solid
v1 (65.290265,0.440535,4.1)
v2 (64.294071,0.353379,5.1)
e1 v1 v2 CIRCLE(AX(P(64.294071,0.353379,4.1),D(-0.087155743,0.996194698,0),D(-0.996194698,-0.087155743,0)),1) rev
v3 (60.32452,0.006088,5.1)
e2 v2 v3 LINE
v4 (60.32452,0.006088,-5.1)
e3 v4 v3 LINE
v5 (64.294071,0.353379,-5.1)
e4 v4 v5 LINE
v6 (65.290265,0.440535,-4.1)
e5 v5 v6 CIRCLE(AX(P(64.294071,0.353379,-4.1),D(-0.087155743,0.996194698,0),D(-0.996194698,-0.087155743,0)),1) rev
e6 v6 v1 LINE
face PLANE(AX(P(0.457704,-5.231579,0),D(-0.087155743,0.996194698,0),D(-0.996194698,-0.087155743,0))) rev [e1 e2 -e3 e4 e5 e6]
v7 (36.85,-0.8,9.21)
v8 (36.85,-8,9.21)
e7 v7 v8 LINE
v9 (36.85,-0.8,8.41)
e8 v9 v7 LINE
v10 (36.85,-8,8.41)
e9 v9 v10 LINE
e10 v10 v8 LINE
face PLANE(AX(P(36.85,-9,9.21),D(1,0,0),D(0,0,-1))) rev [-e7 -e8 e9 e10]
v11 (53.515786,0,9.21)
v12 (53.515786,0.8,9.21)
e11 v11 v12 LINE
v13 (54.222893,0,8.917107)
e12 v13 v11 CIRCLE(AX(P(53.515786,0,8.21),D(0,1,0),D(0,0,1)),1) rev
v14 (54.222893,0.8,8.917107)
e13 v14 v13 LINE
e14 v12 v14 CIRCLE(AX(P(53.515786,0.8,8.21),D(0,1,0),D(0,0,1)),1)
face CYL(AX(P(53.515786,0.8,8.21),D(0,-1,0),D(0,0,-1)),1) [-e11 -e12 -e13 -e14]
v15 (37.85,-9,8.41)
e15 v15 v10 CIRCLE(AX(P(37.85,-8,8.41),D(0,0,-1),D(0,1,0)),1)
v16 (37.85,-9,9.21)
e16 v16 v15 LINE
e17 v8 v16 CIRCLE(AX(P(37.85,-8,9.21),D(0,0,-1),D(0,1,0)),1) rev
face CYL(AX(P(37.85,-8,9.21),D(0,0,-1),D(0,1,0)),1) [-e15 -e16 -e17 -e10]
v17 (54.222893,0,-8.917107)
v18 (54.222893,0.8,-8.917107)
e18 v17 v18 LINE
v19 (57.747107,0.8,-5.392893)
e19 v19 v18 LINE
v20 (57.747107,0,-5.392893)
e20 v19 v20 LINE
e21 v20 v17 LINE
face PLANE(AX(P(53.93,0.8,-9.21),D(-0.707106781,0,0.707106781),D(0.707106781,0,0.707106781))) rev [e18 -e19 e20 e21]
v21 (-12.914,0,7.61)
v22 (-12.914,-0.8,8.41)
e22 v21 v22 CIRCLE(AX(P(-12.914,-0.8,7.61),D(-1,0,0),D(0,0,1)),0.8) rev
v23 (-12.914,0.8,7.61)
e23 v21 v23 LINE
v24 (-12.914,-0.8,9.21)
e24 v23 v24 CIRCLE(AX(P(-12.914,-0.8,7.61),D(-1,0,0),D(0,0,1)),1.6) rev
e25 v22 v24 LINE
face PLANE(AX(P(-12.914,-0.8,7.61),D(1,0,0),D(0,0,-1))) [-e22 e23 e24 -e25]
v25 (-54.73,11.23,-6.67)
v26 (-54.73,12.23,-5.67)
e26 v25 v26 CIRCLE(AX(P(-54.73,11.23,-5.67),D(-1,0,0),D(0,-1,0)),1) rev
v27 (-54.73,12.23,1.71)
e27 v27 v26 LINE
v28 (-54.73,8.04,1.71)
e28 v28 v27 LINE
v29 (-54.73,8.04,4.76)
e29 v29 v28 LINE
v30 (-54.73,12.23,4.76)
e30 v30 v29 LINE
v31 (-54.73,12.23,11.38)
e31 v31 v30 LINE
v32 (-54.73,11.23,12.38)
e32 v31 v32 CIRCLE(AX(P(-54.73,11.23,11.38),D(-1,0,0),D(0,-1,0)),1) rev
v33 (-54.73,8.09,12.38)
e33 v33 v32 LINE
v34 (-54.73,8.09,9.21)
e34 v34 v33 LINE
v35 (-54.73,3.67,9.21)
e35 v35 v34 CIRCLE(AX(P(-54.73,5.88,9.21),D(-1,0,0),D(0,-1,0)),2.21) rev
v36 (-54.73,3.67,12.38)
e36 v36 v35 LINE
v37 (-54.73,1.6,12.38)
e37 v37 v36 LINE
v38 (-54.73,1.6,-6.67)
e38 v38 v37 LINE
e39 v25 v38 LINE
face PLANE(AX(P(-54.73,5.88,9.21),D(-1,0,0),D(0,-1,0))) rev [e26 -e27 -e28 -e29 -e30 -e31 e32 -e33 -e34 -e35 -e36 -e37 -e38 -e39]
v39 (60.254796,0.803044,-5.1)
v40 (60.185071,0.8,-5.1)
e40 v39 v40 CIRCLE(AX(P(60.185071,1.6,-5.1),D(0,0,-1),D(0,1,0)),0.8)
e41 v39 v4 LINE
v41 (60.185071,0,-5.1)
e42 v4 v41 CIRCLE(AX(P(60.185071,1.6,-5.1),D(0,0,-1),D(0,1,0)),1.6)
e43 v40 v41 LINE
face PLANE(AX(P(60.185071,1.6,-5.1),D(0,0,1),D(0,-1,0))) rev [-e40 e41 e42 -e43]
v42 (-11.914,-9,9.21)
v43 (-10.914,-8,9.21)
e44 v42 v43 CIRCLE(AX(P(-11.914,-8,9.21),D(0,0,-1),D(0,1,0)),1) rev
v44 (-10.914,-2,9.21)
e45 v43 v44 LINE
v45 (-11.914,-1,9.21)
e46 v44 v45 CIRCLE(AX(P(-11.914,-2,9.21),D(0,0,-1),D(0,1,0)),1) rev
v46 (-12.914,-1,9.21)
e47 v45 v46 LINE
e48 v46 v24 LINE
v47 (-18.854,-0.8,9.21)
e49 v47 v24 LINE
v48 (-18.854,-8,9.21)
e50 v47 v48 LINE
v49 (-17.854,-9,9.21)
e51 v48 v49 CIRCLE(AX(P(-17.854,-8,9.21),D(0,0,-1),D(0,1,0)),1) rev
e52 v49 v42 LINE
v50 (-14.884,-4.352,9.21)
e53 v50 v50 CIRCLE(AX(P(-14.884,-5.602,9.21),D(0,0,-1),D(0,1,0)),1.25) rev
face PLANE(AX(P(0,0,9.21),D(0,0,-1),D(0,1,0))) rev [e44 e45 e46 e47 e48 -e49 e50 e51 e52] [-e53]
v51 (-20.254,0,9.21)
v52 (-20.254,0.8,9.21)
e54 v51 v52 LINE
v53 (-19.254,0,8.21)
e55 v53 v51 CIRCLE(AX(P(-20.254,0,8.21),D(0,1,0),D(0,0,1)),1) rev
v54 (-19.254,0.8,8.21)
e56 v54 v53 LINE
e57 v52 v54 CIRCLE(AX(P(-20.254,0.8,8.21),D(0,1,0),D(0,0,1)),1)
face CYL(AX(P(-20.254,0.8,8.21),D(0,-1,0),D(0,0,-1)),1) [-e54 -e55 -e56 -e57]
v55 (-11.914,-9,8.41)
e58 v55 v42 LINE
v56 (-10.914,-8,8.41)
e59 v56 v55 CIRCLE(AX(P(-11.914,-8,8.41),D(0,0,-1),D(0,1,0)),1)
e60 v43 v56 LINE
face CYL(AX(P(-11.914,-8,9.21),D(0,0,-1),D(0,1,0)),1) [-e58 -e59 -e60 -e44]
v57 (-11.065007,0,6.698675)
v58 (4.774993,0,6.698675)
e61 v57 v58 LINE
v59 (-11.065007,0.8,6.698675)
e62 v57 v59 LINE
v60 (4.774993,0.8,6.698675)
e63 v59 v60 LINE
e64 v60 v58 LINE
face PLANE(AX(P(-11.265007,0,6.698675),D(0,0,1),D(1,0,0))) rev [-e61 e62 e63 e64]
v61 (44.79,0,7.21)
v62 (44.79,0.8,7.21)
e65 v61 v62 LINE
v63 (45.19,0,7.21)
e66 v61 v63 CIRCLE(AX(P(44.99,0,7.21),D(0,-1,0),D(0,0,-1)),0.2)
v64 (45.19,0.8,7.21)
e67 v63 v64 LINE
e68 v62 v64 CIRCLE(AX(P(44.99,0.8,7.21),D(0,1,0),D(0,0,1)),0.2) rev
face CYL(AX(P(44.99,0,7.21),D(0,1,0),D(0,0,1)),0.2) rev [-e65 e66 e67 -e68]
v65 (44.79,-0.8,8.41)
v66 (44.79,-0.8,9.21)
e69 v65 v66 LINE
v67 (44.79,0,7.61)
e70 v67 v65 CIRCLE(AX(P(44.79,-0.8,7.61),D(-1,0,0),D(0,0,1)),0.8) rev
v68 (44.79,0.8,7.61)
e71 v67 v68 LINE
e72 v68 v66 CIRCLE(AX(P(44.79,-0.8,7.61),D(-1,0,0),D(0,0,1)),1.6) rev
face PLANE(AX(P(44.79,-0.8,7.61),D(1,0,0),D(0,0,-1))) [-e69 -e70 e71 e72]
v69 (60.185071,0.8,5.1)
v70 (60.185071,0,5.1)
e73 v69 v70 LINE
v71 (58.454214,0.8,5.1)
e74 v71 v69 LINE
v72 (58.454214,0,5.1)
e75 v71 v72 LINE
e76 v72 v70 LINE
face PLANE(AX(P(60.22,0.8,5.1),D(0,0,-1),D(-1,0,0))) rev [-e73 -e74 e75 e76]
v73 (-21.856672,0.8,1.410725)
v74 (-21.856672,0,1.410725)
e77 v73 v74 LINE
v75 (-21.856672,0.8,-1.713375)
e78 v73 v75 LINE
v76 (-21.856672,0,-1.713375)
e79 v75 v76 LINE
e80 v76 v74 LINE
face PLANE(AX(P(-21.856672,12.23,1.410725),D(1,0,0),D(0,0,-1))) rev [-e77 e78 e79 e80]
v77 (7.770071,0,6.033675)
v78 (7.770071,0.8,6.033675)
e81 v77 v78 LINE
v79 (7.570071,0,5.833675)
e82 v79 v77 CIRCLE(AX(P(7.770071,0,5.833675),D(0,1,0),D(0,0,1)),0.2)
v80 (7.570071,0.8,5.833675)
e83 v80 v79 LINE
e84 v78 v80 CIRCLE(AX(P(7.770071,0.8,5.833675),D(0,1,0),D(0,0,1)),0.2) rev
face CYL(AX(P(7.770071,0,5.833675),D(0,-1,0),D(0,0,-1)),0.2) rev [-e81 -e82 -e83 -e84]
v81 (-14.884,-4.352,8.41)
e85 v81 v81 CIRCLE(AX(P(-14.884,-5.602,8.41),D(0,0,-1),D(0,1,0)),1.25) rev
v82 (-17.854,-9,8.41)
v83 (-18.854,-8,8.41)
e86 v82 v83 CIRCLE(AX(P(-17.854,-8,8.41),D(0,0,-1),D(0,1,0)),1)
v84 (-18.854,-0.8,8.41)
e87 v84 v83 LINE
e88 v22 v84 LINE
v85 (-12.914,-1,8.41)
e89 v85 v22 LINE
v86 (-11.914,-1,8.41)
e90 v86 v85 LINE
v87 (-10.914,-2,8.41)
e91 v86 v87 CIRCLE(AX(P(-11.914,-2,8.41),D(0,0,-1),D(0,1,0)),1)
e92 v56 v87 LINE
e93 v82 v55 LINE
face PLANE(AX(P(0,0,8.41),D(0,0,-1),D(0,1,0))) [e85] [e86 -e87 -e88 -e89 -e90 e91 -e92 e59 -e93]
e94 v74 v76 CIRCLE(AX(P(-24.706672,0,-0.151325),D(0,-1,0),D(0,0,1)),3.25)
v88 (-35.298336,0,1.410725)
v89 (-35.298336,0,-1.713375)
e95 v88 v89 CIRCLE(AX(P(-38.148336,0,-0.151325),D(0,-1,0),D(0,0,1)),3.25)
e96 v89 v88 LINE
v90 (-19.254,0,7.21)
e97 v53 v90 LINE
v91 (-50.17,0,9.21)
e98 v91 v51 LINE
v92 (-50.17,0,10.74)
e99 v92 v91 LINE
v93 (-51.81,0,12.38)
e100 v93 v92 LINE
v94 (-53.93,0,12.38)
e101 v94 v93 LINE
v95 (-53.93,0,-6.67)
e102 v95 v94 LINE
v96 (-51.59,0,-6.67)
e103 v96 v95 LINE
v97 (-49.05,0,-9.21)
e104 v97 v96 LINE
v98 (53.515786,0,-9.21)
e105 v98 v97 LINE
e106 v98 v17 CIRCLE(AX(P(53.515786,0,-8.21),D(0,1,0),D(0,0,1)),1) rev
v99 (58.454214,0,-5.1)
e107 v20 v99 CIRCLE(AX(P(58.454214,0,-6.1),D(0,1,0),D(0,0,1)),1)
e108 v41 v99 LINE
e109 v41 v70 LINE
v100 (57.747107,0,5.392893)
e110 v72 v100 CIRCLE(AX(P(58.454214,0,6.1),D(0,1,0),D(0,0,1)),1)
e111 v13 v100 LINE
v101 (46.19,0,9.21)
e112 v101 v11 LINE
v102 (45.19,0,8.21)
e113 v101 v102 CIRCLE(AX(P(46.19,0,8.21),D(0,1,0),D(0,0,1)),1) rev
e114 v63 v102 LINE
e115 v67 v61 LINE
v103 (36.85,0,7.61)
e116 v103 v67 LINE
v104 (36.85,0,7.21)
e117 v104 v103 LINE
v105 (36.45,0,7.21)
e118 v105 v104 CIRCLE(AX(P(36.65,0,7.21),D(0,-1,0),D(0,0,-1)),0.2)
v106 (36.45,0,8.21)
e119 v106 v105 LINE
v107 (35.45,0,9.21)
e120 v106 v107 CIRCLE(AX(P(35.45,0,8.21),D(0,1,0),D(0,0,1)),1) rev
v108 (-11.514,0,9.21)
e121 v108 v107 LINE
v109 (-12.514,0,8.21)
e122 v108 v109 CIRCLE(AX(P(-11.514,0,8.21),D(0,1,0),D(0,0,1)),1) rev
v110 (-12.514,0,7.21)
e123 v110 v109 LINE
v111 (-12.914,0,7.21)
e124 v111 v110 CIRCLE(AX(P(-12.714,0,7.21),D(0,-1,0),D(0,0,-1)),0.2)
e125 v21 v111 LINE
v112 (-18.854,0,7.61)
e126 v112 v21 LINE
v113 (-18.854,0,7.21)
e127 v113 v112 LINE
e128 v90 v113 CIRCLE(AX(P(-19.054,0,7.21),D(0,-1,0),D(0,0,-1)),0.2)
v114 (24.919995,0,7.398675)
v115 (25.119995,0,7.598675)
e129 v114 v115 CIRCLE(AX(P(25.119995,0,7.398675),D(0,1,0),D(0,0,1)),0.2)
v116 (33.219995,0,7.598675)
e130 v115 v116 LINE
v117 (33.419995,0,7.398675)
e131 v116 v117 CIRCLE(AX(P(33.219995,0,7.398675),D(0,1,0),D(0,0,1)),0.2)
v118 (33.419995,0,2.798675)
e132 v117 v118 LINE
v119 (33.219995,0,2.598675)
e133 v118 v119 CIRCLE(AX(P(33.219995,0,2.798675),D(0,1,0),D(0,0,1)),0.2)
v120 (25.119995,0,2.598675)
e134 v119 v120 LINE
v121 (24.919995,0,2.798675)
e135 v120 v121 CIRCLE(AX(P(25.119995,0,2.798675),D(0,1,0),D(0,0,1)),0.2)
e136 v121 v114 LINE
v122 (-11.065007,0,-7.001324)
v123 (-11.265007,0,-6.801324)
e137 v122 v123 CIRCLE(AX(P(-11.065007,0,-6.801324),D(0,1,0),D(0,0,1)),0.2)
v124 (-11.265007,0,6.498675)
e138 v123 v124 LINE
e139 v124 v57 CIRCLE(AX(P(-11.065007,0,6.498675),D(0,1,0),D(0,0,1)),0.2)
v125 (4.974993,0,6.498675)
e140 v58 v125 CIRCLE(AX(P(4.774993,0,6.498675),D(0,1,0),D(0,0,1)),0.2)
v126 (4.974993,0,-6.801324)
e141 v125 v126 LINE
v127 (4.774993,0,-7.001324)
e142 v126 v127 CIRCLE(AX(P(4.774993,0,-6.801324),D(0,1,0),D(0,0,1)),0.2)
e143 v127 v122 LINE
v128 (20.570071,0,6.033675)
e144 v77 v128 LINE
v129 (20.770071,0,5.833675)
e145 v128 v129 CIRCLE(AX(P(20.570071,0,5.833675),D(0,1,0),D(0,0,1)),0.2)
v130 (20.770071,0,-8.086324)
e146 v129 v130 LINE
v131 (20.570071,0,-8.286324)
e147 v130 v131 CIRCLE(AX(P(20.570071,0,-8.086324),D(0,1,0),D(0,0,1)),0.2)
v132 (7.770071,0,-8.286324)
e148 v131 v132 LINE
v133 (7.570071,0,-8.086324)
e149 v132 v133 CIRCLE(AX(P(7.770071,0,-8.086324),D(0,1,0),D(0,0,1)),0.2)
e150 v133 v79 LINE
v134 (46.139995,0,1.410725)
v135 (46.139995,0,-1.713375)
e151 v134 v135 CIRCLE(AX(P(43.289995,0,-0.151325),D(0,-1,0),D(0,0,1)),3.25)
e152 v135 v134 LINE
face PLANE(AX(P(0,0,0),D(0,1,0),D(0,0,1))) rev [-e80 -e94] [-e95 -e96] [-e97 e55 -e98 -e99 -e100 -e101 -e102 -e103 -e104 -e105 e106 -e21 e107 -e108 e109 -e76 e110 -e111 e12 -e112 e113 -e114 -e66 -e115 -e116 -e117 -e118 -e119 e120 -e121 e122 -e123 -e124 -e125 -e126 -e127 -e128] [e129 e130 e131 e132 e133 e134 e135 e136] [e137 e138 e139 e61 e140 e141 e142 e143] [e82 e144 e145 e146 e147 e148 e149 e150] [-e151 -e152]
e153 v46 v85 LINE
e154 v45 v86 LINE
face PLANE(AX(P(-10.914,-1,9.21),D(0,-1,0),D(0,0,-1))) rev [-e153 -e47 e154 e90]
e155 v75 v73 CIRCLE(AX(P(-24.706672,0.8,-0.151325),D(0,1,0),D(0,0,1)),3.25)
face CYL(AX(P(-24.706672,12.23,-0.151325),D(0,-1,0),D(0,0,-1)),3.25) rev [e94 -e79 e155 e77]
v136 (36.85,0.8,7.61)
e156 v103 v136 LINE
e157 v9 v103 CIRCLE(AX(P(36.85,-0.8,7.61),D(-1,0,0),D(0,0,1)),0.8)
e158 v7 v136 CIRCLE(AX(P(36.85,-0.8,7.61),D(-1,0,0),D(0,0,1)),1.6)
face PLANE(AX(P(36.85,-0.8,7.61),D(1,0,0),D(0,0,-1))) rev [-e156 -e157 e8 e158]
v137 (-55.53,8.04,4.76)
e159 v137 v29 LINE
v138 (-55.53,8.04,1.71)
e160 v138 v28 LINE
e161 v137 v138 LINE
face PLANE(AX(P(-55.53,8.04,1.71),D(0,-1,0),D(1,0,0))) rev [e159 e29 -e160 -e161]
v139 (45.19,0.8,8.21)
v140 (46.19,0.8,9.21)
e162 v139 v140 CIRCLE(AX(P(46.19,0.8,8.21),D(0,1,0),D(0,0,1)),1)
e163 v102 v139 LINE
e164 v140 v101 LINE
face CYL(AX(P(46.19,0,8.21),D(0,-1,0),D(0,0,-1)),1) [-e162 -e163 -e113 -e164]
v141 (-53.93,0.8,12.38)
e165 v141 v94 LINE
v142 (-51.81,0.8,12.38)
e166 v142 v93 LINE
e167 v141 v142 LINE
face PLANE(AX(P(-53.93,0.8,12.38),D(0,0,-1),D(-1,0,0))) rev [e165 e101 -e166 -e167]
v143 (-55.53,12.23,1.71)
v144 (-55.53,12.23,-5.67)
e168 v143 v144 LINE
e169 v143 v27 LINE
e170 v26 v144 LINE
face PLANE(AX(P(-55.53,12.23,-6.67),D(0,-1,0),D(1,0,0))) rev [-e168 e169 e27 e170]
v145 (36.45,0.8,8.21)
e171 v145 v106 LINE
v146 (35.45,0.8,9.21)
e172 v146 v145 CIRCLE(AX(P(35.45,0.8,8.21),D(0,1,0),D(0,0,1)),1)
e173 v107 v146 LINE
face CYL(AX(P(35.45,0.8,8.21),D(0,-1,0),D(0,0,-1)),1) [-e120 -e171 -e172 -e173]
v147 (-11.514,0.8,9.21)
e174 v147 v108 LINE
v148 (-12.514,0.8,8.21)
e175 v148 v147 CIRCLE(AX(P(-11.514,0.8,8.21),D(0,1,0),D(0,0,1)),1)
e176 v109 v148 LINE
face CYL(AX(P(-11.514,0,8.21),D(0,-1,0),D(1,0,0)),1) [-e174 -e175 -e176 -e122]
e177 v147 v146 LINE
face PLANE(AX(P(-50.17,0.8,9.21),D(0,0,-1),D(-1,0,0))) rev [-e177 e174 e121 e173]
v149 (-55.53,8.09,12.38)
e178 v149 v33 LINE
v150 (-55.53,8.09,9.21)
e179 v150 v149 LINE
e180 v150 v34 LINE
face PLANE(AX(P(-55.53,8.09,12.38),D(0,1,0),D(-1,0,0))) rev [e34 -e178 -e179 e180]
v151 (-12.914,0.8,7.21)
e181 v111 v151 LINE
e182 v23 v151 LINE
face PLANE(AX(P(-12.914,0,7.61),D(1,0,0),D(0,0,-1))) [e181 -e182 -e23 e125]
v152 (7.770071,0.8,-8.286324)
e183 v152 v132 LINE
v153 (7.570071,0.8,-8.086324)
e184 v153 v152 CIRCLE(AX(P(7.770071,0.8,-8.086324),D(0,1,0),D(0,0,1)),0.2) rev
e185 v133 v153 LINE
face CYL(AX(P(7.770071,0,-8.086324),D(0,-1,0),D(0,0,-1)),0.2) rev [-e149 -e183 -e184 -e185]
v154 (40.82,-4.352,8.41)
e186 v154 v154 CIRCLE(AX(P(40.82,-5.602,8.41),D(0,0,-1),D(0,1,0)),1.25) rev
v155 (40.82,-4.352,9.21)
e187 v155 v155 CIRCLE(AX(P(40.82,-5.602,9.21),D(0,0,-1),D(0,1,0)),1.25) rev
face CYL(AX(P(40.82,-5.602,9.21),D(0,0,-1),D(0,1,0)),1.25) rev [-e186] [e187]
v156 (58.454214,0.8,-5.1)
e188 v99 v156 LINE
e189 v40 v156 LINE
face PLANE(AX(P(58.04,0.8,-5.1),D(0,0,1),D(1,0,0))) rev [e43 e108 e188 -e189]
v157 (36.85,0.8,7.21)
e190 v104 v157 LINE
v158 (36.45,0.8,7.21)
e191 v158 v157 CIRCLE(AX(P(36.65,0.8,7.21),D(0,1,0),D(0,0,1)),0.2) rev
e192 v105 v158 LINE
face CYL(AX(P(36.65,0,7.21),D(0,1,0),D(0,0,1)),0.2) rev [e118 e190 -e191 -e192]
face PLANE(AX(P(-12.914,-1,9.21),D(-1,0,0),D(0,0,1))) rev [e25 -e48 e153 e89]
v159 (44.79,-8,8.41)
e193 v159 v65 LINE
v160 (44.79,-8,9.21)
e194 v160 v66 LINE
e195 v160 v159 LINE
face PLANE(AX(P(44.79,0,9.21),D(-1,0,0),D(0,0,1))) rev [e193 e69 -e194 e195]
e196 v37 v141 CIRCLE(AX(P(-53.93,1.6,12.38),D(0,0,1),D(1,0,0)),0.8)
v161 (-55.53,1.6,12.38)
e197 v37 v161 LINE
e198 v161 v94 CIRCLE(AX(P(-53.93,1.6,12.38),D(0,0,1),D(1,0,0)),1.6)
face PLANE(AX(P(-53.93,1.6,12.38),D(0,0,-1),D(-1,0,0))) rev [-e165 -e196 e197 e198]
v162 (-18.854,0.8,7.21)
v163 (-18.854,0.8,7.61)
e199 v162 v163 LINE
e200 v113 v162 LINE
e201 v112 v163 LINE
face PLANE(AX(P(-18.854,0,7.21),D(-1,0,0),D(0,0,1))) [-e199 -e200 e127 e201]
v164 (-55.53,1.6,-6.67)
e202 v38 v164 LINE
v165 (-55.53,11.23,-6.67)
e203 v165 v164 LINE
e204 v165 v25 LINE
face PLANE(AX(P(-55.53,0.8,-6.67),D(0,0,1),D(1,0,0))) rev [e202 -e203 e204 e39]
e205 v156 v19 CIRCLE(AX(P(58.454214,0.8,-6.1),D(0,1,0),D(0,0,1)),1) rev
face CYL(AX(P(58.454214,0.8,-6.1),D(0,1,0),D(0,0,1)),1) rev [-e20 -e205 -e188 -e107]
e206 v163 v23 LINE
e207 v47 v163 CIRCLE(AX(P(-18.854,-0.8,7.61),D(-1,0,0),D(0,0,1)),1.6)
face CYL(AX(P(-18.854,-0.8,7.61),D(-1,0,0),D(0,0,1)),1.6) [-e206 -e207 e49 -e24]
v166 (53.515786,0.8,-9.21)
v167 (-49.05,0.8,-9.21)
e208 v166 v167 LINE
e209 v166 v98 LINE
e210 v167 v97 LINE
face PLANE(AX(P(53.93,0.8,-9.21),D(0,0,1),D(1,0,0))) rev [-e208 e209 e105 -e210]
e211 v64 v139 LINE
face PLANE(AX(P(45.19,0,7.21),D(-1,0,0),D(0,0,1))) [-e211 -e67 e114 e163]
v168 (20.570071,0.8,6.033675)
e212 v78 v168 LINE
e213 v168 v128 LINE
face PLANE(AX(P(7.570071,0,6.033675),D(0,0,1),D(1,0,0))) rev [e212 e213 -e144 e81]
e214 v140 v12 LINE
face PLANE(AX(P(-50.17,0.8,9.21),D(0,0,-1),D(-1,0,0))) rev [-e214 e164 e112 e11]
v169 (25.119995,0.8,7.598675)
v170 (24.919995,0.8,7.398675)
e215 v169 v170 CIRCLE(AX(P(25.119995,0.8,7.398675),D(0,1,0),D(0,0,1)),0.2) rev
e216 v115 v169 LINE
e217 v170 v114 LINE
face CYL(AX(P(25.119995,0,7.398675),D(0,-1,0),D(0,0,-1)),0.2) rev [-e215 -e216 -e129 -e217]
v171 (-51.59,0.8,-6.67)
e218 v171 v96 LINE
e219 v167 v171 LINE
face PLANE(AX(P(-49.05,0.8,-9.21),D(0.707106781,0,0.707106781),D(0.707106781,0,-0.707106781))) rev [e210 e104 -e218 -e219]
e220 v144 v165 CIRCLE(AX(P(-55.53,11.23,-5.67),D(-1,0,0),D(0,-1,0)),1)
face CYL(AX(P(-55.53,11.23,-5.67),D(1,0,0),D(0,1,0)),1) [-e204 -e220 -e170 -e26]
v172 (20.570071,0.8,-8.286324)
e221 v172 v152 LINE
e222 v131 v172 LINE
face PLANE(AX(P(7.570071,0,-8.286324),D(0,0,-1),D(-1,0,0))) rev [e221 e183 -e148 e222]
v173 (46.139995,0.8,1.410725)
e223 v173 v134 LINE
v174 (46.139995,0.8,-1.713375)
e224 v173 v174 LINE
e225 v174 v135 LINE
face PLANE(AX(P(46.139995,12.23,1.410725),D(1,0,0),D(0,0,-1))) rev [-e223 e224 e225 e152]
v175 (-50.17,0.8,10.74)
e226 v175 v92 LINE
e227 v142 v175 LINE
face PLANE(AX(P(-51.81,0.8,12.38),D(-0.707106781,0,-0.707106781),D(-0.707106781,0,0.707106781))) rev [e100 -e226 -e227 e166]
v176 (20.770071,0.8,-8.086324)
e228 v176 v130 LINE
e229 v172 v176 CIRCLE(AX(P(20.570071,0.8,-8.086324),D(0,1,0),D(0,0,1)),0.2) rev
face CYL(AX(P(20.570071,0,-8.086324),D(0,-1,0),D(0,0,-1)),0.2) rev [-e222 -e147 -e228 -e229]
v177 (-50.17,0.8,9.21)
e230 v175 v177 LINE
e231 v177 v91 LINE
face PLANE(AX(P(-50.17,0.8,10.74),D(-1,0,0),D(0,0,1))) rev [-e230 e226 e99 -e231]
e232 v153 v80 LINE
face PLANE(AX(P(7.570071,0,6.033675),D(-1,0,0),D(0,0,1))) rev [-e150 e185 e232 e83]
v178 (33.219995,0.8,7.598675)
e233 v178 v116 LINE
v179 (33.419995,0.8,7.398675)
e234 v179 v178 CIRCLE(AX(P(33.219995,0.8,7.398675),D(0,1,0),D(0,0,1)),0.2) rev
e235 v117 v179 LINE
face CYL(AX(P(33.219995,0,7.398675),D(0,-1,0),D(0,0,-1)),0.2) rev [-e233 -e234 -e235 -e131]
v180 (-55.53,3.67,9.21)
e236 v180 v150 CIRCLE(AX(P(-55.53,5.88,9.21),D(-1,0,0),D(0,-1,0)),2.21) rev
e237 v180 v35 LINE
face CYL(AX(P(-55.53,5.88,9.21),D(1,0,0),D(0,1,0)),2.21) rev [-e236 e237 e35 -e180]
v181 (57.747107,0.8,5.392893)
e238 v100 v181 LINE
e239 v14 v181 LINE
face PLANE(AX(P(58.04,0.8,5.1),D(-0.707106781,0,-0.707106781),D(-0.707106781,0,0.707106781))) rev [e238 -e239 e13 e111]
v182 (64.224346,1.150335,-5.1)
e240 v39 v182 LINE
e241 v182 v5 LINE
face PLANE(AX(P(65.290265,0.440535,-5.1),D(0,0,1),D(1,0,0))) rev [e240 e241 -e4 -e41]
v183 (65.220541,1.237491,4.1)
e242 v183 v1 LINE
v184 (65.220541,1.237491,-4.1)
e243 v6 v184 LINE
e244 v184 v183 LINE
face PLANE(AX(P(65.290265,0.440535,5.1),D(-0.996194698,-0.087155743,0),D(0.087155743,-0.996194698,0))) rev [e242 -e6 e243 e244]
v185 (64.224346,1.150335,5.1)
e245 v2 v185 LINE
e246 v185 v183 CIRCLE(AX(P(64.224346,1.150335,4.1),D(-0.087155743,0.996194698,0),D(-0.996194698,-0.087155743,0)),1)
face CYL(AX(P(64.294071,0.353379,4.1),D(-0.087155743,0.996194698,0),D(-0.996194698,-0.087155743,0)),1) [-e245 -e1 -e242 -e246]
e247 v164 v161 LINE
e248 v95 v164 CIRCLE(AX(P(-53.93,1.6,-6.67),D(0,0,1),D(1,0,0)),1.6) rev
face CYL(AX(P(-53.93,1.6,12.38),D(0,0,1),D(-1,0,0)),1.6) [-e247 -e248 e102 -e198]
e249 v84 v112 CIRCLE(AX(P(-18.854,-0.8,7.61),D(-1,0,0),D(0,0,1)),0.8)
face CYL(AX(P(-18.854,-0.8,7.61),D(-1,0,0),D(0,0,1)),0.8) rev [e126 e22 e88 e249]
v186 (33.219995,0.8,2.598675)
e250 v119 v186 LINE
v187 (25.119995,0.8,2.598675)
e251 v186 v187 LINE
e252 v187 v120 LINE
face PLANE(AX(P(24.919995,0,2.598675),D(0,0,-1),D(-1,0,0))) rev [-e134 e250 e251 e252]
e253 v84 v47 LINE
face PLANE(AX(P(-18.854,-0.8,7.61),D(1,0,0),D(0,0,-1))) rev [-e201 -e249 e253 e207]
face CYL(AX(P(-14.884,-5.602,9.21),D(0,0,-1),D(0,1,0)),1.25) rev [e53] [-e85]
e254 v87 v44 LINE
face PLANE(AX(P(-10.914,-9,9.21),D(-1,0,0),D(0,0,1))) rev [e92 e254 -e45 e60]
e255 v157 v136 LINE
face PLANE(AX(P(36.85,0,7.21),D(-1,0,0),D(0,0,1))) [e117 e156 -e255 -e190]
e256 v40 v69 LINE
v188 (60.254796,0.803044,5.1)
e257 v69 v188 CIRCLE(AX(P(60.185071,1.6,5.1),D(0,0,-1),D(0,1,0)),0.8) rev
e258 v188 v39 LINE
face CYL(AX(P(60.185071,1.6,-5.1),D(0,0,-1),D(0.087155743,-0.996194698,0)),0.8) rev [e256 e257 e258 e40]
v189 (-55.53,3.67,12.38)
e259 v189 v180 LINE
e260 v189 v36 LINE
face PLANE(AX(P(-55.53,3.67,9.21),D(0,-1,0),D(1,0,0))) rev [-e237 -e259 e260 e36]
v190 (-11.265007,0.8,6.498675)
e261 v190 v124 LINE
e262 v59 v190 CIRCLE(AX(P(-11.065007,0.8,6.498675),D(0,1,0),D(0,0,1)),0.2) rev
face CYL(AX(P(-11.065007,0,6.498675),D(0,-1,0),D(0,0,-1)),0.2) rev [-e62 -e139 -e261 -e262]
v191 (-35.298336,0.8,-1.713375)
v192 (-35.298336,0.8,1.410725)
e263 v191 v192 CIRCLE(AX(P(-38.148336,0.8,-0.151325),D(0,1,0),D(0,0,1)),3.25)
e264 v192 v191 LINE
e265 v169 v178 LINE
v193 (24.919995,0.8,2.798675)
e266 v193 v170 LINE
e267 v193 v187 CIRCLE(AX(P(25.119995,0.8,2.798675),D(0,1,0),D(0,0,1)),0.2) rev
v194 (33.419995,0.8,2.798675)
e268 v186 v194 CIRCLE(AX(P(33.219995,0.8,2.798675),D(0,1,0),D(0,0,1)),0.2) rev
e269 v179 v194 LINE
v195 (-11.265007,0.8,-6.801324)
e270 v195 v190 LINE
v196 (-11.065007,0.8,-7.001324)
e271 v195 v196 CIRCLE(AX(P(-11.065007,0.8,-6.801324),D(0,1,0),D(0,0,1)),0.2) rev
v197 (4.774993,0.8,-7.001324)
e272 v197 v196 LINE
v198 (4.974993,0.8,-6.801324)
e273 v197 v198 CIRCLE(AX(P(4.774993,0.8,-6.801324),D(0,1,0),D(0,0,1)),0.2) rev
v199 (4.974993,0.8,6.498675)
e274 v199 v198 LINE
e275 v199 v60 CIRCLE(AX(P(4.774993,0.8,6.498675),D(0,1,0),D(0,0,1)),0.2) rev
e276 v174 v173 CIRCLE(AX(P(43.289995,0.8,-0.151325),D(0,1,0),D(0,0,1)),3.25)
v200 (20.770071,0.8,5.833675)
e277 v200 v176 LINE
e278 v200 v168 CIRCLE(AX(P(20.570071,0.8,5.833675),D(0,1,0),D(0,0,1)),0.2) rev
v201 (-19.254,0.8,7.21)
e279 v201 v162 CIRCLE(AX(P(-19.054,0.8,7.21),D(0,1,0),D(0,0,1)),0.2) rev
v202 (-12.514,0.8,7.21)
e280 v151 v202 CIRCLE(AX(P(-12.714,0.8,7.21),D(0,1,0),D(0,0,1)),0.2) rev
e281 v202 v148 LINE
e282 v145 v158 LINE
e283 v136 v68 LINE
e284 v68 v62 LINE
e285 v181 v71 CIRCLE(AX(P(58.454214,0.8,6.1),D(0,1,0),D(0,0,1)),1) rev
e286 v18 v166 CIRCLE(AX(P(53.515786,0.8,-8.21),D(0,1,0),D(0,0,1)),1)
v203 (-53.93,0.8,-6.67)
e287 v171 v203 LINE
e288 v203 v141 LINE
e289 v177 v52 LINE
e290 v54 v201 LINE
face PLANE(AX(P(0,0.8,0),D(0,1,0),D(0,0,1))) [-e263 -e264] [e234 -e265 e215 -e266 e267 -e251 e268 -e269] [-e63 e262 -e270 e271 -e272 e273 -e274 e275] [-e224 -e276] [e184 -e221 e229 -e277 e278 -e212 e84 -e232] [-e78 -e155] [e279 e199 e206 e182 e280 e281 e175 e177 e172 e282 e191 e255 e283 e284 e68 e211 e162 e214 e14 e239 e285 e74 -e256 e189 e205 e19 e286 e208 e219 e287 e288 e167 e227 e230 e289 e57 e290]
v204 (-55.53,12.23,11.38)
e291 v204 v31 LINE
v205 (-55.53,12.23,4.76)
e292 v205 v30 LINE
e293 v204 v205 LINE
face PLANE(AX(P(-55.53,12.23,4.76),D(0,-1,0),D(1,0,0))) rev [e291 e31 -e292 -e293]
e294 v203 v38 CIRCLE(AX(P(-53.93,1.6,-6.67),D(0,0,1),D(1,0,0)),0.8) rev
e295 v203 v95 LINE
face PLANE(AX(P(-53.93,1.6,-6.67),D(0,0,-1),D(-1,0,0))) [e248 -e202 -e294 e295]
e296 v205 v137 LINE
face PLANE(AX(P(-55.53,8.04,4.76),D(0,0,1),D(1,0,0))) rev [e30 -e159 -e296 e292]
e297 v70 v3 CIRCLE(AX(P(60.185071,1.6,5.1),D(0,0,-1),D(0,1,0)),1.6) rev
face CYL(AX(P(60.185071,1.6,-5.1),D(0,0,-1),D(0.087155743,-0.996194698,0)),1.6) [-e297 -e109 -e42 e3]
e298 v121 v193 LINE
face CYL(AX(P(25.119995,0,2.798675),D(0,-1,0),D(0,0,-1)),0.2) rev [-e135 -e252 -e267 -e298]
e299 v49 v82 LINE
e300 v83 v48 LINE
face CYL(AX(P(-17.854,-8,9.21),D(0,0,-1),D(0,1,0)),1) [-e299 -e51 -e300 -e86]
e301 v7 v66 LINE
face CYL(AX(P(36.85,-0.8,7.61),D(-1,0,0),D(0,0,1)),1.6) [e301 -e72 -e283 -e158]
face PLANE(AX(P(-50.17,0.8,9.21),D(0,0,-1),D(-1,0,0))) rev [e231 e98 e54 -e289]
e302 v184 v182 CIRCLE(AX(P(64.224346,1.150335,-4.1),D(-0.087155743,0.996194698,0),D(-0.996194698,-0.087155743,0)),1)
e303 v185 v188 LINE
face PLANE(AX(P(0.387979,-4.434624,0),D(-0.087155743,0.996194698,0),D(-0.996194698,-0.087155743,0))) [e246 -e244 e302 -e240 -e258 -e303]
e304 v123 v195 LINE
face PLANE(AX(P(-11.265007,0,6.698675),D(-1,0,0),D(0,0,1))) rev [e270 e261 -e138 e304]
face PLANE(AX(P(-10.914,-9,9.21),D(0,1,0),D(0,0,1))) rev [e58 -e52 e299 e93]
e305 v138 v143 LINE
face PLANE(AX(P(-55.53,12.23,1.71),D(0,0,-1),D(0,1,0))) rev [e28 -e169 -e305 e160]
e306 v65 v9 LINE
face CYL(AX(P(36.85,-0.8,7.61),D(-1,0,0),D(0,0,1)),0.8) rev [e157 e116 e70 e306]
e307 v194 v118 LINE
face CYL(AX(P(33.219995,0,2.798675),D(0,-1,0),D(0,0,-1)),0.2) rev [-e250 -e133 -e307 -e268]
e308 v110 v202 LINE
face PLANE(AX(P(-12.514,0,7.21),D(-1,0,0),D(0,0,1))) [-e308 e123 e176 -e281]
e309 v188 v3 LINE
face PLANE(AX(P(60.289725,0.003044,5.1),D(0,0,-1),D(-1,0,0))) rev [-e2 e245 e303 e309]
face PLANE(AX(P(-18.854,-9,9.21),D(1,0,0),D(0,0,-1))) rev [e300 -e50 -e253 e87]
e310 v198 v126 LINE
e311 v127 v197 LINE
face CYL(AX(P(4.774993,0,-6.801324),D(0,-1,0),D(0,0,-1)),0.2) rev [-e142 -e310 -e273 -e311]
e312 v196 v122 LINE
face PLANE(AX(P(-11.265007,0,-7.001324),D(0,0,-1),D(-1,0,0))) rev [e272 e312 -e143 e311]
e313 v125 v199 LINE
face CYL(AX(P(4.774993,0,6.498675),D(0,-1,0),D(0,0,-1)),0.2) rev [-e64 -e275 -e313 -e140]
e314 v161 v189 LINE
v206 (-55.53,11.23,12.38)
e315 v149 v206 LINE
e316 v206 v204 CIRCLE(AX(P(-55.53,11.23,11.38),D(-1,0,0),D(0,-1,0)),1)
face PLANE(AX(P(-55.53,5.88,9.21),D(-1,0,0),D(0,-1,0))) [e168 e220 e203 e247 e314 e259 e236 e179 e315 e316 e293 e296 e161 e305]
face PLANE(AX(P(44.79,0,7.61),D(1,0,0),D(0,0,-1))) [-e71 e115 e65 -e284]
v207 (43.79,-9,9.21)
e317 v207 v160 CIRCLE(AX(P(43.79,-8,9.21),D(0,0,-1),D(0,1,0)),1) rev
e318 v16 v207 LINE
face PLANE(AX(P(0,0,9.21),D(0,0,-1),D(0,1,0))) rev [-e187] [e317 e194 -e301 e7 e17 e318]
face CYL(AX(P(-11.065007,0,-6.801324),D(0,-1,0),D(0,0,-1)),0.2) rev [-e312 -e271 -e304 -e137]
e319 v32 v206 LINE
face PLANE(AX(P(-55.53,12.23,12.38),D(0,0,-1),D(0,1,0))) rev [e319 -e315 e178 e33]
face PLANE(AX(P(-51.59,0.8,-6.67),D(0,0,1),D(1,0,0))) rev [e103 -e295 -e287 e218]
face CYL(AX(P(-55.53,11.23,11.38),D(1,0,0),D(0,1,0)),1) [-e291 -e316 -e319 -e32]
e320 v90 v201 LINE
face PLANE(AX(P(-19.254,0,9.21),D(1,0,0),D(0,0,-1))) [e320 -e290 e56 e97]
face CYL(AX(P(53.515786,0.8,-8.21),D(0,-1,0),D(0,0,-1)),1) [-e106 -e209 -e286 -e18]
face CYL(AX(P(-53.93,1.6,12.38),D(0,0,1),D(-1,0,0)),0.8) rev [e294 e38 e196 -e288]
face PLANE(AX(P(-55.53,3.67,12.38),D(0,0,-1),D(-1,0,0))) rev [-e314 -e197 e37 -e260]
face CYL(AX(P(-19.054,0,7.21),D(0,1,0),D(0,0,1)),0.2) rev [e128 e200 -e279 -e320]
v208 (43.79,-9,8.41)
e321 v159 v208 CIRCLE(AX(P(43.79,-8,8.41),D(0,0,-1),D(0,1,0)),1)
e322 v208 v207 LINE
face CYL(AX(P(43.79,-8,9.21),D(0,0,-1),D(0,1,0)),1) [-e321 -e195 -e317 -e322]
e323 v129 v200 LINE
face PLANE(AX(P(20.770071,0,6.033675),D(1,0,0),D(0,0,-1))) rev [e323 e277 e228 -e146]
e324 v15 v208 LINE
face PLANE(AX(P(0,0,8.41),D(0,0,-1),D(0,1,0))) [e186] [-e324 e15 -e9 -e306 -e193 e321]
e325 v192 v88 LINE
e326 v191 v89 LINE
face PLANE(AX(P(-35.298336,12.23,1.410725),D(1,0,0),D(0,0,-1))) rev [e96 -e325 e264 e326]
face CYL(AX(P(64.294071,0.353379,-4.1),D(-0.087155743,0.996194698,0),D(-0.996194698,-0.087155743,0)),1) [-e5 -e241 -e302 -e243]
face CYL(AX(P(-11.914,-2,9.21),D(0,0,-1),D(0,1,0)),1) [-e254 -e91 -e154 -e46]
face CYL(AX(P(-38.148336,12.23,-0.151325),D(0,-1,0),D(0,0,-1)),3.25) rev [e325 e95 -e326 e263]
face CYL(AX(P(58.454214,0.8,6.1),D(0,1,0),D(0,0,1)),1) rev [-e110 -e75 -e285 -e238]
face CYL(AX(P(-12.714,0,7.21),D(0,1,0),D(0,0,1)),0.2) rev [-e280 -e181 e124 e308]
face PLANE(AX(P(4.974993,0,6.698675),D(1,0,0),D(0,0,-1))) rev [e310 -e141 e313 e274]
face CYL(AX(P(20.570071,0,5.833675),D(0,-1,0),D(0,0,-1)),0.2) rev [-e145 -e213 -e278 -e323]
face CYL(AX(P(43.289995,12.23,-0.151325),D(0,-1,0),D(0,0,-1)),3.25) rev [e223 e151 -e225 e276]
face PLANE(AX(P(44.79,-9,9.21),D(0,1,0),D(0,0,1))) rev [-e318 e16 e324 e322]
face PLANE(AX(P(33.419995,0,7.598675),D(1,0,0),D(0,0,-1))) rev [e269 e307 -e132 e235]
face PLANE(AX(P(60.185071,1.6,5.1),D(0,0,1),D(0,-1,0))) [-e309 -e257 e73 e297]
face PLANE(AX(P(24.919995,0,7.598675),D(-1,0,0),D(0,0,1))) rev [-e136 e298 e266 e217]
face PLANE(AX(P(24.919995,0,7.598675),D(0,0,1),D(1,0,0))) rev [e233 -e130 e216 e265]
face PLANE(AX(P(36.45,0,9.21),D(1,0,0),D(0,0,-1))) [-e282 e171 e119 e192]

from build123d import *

# Parameters (mm, degrees)
SM_BASE_FLANGE_1_DEPTH           = 0.8
SKETCH_25_W                      = 16.240000001
SKETCH_25_H                      = 13.699999542
SKETCH_25_W_2                    = 13.2
SKETCH_25_H_2                    = 14.319999239
SKETCH_25_W_3                    = 8.5
SKETCH_25_H_3                    = 5
CUT_EXTRUDE_1_DEPTH              = 62.484573675
SM_EDGE_FLANGE_1_STRIP_CUT_DEPTH = 10.2
SM_EDGE_FLANGE_1_DEPTH           = 10.2
SM_START                         = -0.8
SM_EDGE_FLANGE_2_DEPTH           = 2.8
SM_START_2                       = 0.715504
SM_EDGE_FLANGE_2_2_OUTLINE_W     = 7.94
SM_EDGE_FLANGE_2_2_OUTLINE_H     = 0.8
SM_EDGE_FLANGE_2_2_DEPTH         = 1.284496
SM_START_3                       = -4.3519999
SM_EDGE_FLANGE_2_3_OUTLINE_W     = 7.94
SM_EDGE_FLANGE_2_3_OUTLINE_H     = 0.8
SM_EDGE_FLANGE_2_3_DEPTH         = 3.5519999
SM_START_4                       = -9
SM_EDGE_FLANGE_2_4_OUTLINE_W     = 7.94
SM_EDGE_FLANGE_2_4_OUTLINE_H     = 0.8
SM_EDGE_FLANGE_2_4_DEPTH         = 2.1479999
SM_START_5                       = 36.85
SM_EDGE_FLANGE_2_5_DEPTH         = 7.94
SM_EDGE_FLANGE_2_6_OUTLINE_W     = 2.5000002
SM_EDGE_FLANGE_2_6_OUTLINE_H     = 0.8
SM_EDGE_FLANGE_2_6_DEPTH         = 2.7199999
SM_START_6                       = 42.0700001
SM_EDGE_FLANGE_2_7_OUTLINE_W     = 2.5000002
SM_EDGE_FLANGE_2_7_OUTLINE_H     = 0.8
SM_EDGE_FLANGE_2_7_DEPTH         = 2.7199999
SM_START_7                       = 37.6657556
SM_EDGE_FLANGE_2_8_DEPTH         = 6.2856216
SM_START_8                       = 8.41
SM_EDGE_FLANGE_2_9_DEPTH         = 0.8
SM_START_9                       = -18.854
SM_EDGE_FLANGE_3_OUTLINE_W       = 8
SM_EDGE_FLANGE_3_OUTLINE_H       = 0.8
SM_EDGE_FLANGE_3_DEPTH           = 2.7199999
SM_START_10                      = -13.6339999
SM_EDGE_FLANGE_3_2_OUTLINE_W     = 8
SM_EDGE_FLANGE_3_2_OUTLINE_H     = 0.8
SM_EDGE_FLANGE_3_2_DEPTH         = 2.7199999
SM_START_11                      = -19.254
SM_EDGE_FLANGE_3_3_DEPTH         = 6.74
SM_EDGE_FLANGE_3_4_DEPTH         = 5.94
SM_EDGE_FLANGE_3_5_DEPTH         = 0.8
SM_START_12                      = -1
SM_EDGE_FLANGE_3_6_DEPTH         = 3
SM_EDGE_FLANGE_4_DEPTH           = 19.05
SM_START_13                      = 0.8
SM_EDGE_FLANGE_4_FLAT_DEPTH      = 0.8
FILLET_1_R                       = 1
FILLET_2_R                       = 0.2
CUT_EXTRUDE1_DEPTH               = 68.569638492


with BuildPart() as part:
    # Базовая кромка1: sheet metal written as solids
    # Sketch 1 → Базовая кромка1 (new body)
    with BuildSketch(Plane(origin=(0, 0, 0), x_dir=(1, 0, 0), z_dir=(0, 1, 0))):
        Polygon((53.93, 9.21), (58.04, 5.1), (60.22, 5.1), (60.22, -5.1), (58.04, -5.1), (53.93, -9.21), (-50.17, -9.21), (-50.17, -10.74), (-51.81, -12.38), (-53.93, -12.38), (-53.93, 6.67), (-51.59, 6.67), (-49.05, 9.21), align=None)
    extrude(amount=SM_BASE_FLANGE_1_DEPTH)

    # Эскиз25 → Вырез-Вытянуть1 (cut, through all)
    with BuildSketch(Plane(origin=(0, 0.8, 0), x_dir=(1, 0, 0), z_dir=(0, 1, 0))):
        with Locations((-3.145007461, 0.151324571)):
            Rectangle(SKETCH_25_W, SKETCH_25_H)
        with Locations((14.170071276, 1.126324154)):
            Rectangle(SKETCH_25_W_2, SKETCH_25_H_2)
        with Locations((29.1699949, -5.0986752)):
            Rectangle(SKETCH_25_W_3, SKETCH_25_H_3)
    extrude(amount=-CUT_EXTRUDE_1_DEPTH, mode=Mode.SUBTRACT)

    # Ребро-кромка1: sheet metal written as solids
    # Ребро-кромка1 strip (on a plane across the edge) → Ребро-кромка1 strip cut (cut)
    with BuildSketch(Plane(origin=(60.22, 0.8, 5.1), x_dir=(-0.08715574274765156, 0.9961946980917461, 0), z_dir=(0, 0, -1))):
        Polygon((-1.212259082, 4.677214117), (-0.793911517, -0.104520434), (0.003044242, -0.03479584), (-0.415303324, 4.746938711), align=None)
    extrude(amount=SM_EDGE_FLANGE_1_STRIP_CUT_DEPTH, mode=Mode.SUBTRACT)

    # Ребро-кромка1 section (on a plane across the edge) → Ребро-кромка1 (add)
    with BuildSketch(Plane(origin=(60.22, 0.8, 5.1), x_dir=(-0.08715574274765156, 0.9961946980917461, 0), z_dir=(0, 0, -1))):
        with BuildLine():
            Line((-0.8, 0.034928754), (-0.8, 5.019641982))
            Line((-0.8, 5.019641982), (0, 5.019641982))
            Line((0, 5.019641982), (0, 0.034928754))
            ThreePointArc((0, 0.034928754), (0.000761423, 3.3244e-05), (0.003044242, -0.03479584))
            Line((0.003044242, -0.03479584), (-0.793911517, -0.104520434))
            ThreePointArc((-0.793911517, -0.104520434), (-0.798477155, -0.034862265), (-0.8, 0.034928754))
        make_face()
    extrude(amount=SM_EDGE_FLANGE_1_DEPTH)

    # Ребро-кромка2: read off the stored shape, not the designer's step
    # Ребро-кромка2 outline → Ребро-кромка2 (cut)
    with BuildSketch(Plane(origin=(0, 0, 0), x_dir=(1, 0, 0), z_dir=(0, 1, 0)).offset(SM_START)):
        with BuildLine():
            Line((44.79, -7.21), (44.79, -9.21))
            Line((44.79, -9.21), (45.19, -9.21))
            Line((45.19, -9.21), (45.19, -7.21))
            ThreePointArc((45.19, -7.21), (44.99, -7.01), (44.79, -7.21))
        make_face()
        with BuildLine():
            Line((36.45, -9.21), (36.85, -9.21))
            Line((36.85, -9.21), (36.85, -7.21))
            ThreePointArc((36.85, -7.21), (36.65, -7.01), (36.45, -7.21))
            Line((36.45, -7.21), (36.45, -9.21))
        make_face()
    extrude(amount=SM_EDGE_FLANGE_2_DEPTH, mode=Mode.SUBTRACT)

    # Sm Edge Flange 2 2 outline → Sm Edge Flange 2 2 (cut)
    with BuildSketch(Plane(origin=(0, 0, 0), x_dir=(1, 0, 0), z_dir=(0, 1, 0)).offset(SM_START_2)):
        with Locations((40.82, -8.81)):
            Rectangle(SM_EDGE_FLANGE_2_2_OUTLINE_W, SM_EDGE_FLANGE_2_2_OUTLINE_H)
    extrude(amount=SM_EDGE_FLANGE_2_2_DEPTH, mode=Mode.SUBTRACT)

    # Sm Edge Flange 2 5 outline → Sm Edge Flange 2 5 (cut)
    with BuildSketch(Plane.YZ.offset(SM_START_5)):
        with BuildLine():
            Line((0, 9.21), (0, 8.995640646))
            ThreePointArc((0, 8.995640646), (0.585640646, 8.41), (0.8, 7.61))
            Line((0.8, 7.61), (0.8, 8.41))
            Line((0.8, 8.41), (0.715504, 8.41))
            Line((0.715504, 8.41), (0.715504, 9.21))
            Line((0.715504, 9.21), (0, 9.21))
        make_face()
    extrude(amount=SM_EDGE_FLANGE_2_5_DEPTH, mode=Mode.SUBTRACT)



with BuildPart() as body_2:
    # Sm Edge Flange 2 3 outline → Sm Edge Flange 2 3 (new body)
    with BuildSketch(Plane(origin=(0, 0, 0), x_dir=(1, 0, 0), z_dir=(0, 1, 0)).offset(SM_START_3)):
        with Locations((40.82, -8.81)):
            Rectangle(SM_EDGE_FLANGE_2_3_OUTLINE_W, SM_EDGE_FLANGE_2_3_OUTLINE_H)
    extrude(amount=SM_EDGE_FLANGE_2_3_DEPTH)


with BuildPart() as body_3:
    # Sm Edge Flange 2 4 outline → Sm Edge Flange 2 4 (new body)
    with BuildSketch(Plane(origin=(0, 0, 0), x_dir=(1, 0, 0), z_dir=(0, 1, 0)).offset(SM_START_4)):
        with Locations((40.82, -8.81)):
            Rectangle(SM_EDGE_FLANGE_2_4_OUTLINE_W, SM_EDGE_FLANGE_2_4_OUTLINE_H)
    extrude(amount=SM_EDGE_FLANGE_2_4_DEPTH)


with BuildPart() as part_1:
    add(part.part)

    add(body_2.part)  # Sm Edge Flange 2 6 merges body 2

    add(body_3.part)  # Sm Edge Flange 2 6 merges body 3
    # Sm Edge Flange 2 6 outline → Sm Edge Flange 2 6 (add)
    with BuildSketch(Plane.YZ.offset(SM_START_5)):
        with Locations((-5.602, 8.81)):
            Rectangle(SM_EDGE_FLANGE_2_6_OUTLINE_W, SM_EDGE_FLANGE_2_6_OUTLINE_H)
        with BuildLine():
            ThreePointArc((0, 8.995640646), (-0.385889528, 9.155481322), (-0.8, 9.21))
            Line((-0.8, 9.21), (-0.8, 8.41))
            ThreePointArc((-0.8, 8.41), (-0.234314575, 8.175685425), (0, 7.61))
            Line((0, 7.61), (0, 8.995640646))
        make_face()
    extrude(amount=SM_EDGE_FLANGE_2_6_DEPTH)

    # Sm Edge Flange 2 7 outline → Sm Edge Flange 2 7 (add)
    with BuildSketch(Plane.YZ.offset(SM_START_6)):
        with Locations((-5.602, 8.81)):
            Rectangle(SM_EDGE_FLANGE_2_7_OUTLINE_W, SM_EDGE_FLANGE_2_7_OUTLINE_H)
        with BuildLine():
            ThreePointArc((0, 8.995640646), (-0.385889528, 9.155481322), (-0.8, 9.21))
            Line((-0.8, 9.21), (-0.8, 8.41))
            ThreePointArc((-0.8, 8.41), (-0.234314575, 8.175685425), (0, 7.61))
            Line((0, 7.61), (0, 8.995640646))
        make_face()
    extrude(amount=SM_EDGE_FLANGE_2_7_DEPTH)

    # Sm Edge Flange 2 8 outline → Sm Edge Flange 2 8 (add)
    with BuildSketch(Plane.YZ.offset(SM_START_7)):
        with BuildLine():
            ThreePointArc((0, 8.995640646), (-0.385889528, 9.155481322), (-0.8, 9.21))
            Line((-0.8, 9.21), (-0.8, 8.41))
            ThreePointArc((-0.8, 8.41), (-0.234314575, 8.175685425), (0, 7.61))
            Line((0, 7.61), (0, 8.995640646))
        make_face()
    extrude(amount=SM_EDGE_FLANGE_2_8_DEPTH)

    # Sm Edge Flange 2 9 outline → Sm Edge Flange 2 9 (add)
    with BuildSketch(Plane.XY.offset(SM_START_8)):
        with BuildLine():
            Line((42.0700001, -6.8520001), (42.07, -5.602))
            ThreePointArc((42.07, -5.602), (41.703883476, -6.485883476), (40.82, -6.852))
            Line((40.82, -6.852), (42.0700001, -6.8520001))
        make_face()
        with BuildLine():
            ThreePointArc((40.82, -4.352), (41.703883476, -4.718116524), (42.07, -5.602))
            Line((42.07, -5.602), (42.0700001, -4.3519999))
            Line((42.0700001, -4.3519999), (40.82, -4.352))
        make_face()
        with BuildLine():
            ThreePointArc((39.57, -5.602), (39.936116524, -4.718116524), (40.82, -4.352))
            Line((40.82, -4.352), (39.5699999, -4.3519999))
            Line((39.5699999, -4.3519999), (39.57, -5.602))
        make_face()
        with BuildLine():
            Line((39.5699999, -6.8520001), (40.82, -6.852))
            ThreePointArc((40.82, -6.852), (39.936116524, -6.485883476), (39.57, -5.602))
            Line((39.57, -5.602), (39.5699999, -6.8520001))
        make_face()
    extrude(amount=SM_EDGE_FLANGE_2_9_DEPTH)

    # Sm Edge Flange 3 3 outline → Sm Edge Flange 3 3 (cut)
    with BuildSketch(Plane.YZ.offset(SM_START_11)):
        with BuildLine():
            Line((0, 9.21), (0, 8.995640646))
            ThreePointArc((0, 8.995640646), (0.585640646, 8.41), (0.8, 7.61))
            Line((0.8, 7.61), (0.8, 9.21))
            Line((0.8, 9.21), (0, 9.21))
        make_face()
    extrude(amount=SM_EDGE_FLANGE_3_3_DEPTH, mode=Mode.SUBTRACT)



with BuildPart() as body_2_2:
    # Ребро-кромка3: read off the stored shape, not the designer's step
    # Ребро-кромка3 outline → Ребро-кромка3 (new body)
    with BuildSketch(Plane.YZ.offset(SM_START_9)):
        with Locations((-5, 8.81)):
            Rectangle(SM_EDGE_FLANGE_3_OUTLINE_W, SM_EDGE_FLANGE_3_OUTLINE_H)
    extrude(amount=SM_EDGE_FLANGE_3_DEPTH)


with BuildPart() as body_3_2:
    # Sm Edge Flange 3 2 outline → Sm Edge Flange 3 2 (new body)
    with BuildSketch(Plane.YZ.offset(SM_START_10)):
        with Locations((-5, 8.81)):
            Rectangle(SM_EDGE_FLANGE_3_2_OUTLINE_W, SM_EDGE_FLANGE_3_2_OUTLINE_H)
    extrude(amount=SM_EDGE_FLANGE_3_2_DEPTH)


with BuildPart() as part_2:
    add(part_1.part)

    add(body_2_2.part)  # Sm Edge Flange 3 4 merges body 2 2

    add(body_3_2.part)  # Sm Edge Flange 3 4 merges body 3 2
    # Sm Edge Flange 3 4 outline → Sm Edge Flange 3 4 (add)
    with BuildSketch(Plane.YZ.offset(SM_START_9)):
        with BuildLine():
            Line((-0.8, 9.21), (-1, 9.21))
            Line((-1, 9.21), (-1, 8.41))
            Line((-1, 8.41), (-0.8, 8.41))
            ThreePointArc((-0.8, 8.41), (-0.234314575, 8.175685425), (0, 7.61))
            Line((0, 7.61), (0, 8.995640646))
            ThreePointArc((0, 8.995640646), (-0.385889528, 9.155481322), (-0.8, 9.21))
        make_face()
    extrude(amount=SM_EDGE_FLANGE_3_4_DEPTH)

    # Sm Edge Flange 3 5 outline → Sm Edge Flange 3 5 (add)
    with BuildSketch(Plane.XY.offset(SM_START_8)):
        with BuildLine():
            Line((-13.6339999, -9), (-13.634, -5.602))
            ThreePointArc((-13.634, -5.602), (-14.884, -6.852), (-16.134, -5.602))
            Line((-16.134, -5.602), (-16.1340001, -9))
            Line((-16.1340001, -9), (-13.6339999, -9))
        make_face()
        with BuildLine():
            ThreePointArc((-16.134, -5.602), (-14.884, -4.352), (-13.634, -5.602))
            Line((-13.634, -5.602), (-13.6339999, -1))
            Line((-13.6339999, -1), (-16.1340001, -1))
            Line((-16.1340001, -1), (-16.134, -5.602))
        make_face()
    extrude(amount=SM_EDGE_FLANGE_3_5_DEPTH)

    # Sm Edge Flange 3 6 outline → Sm Edge Flange 3 6 (cut)
    with BuildSketch(Plane(origin=(0, 0, 0), x_dir=(1, 0, 0), z_dir=(0, 1, 0)).offset(SM_START_12)):
        with BuildLine():
            Line((-18.854, -9), (-18.854, -7.21))
            ThreePointArc((-18.854, -7.21), (-19.054, -7.01), (-19.254, -7.21))
            Line((-19.254, -7.21), (-19.254, -9))
            Line((-19.254, -9), (-18.854, -9))
        make_face()
        with BuildLine():
            Line((-12.914, -7.21), (-12.914, -9))
            Line((-12.914, -9), (-12.514, -9))
            Line((-12.514, -9), (-12.514, -7.21))
            ThreePointArc((-12.514, -7.21), (-12.714, -7.01), (-12.914, -7.21))
        make_face()
    extrude(amount=SM_EDGE_FLANGE_3_6_DEPTH, mode=Mode.SUBTRACT)

    # Ребро-кромка4: sheet metal written as solids
    # Ребро-кромка4 bend section (on a plane across the edge) → Ребро-кромка4 (add)
    with BuildSketch(Plane(origin=(-54.73, 0.8, -6.67), x_dir=(1, 0, 0), z_dir=(0, 0, 1))):
        with BuildLine():
            Line((-0.8, 0.8), (0, 0.8))
            ThreePointArc((0, 0.8), (0.234314575, 0.234314575), (0.8, 0))
            Line((0.8, 0), (0.8, -0.8))
            ThreePointArc((0.8, -0.8), (-0.33137085, -0.33137085), (-0.8, 0.8))
        make_face()
    extrude(amount=SM_EDGE_FLANGE_4_DEPTH)

    # Ребро-кромка4 profile (on flange) → Ребро-кромка4 flat (add)
    with BuildSketch(Plane(origin=(-54.73, 0.8, 0), x_dir=(0, 0, 1), z_dir=(-1, 0, 0)).offset(SM_START_13)):
        with BuildLine():
            Line((-6.67, 11.43), (-6.67, 0.8))
            Line((-6.67, 0.8), (12.38, 0.8))
            Line((12.38, 0.8), (12.38, 2.87))
            Line((12.38, 2.87), (9.21, 2.87))
            ThreePointArc((9.21, 2.87), (7, 5.08), (9.21, 7.29))
            Line((9.21, 7.29), (12.38, 7.29))
            Line((12.38, 7.29), (12.38, 11.43))
            Line((12.38, 11.43), (4.76, 11.43))
            Line((4.76, 11.43), (4.76, 7.24))
            Line((4.76, 7.24), (1.71, 7.24))
            Line((1.71, 7.24), (1.71, 11.43))
            Line((1.71, 11.43), (-6.67, 11.43))
        make_face()
    extrude(amount=-SM_EDGE_FLANGE_4_FLAT_DEPTH)

    # Скругление1
    fillet_1_edges = [part_2.edges().sort_by_distance(p)[0] for p in [
        (65.255403026, 0.839012746, 5.1),
        (65.255403026, 0.839012746, -5.1),
        (36.45, 0.4, 9.21),
        (45.19, 0.4, 9.21),
        (44.79, -9, 8.81),
        (36.85, -9, 8.81),
        (-19.254, 0.4, 9.21),
        (-12.514, 0.4, 9.21),
        (-18.854, -9, 8.81),
        (-10.914, -9, 8.81),
        (-10.914, -1, 8.81),
        (53.93, 0.4, -9.21),
        (58.04, 0.4, -5.1),
        (58.04, 0.4, 5.1),
        (53.93, 0.4, 9.21),
        (-55.13, 12.23, -6.67),
        (-55.13, 12.23, 12.38),
    ]]
    fillet(fillet_1_edges, radius=FILLET_1_R)

    # Скругление2
    fillet_2_edges = [part_2.edges().sort_by_distance(p)[0] for p in [
        (-11.265007461, 0.4, 6.6986752),
        (-11.265007461, 0.4, -7.001324342),
        (4.97499254, 0.4, -7.001324342),
        (4.97499254, 0.4, 6.6986752),
        (7.570071276, 0.4, 6.033675466),
        (7.570071276, 0.4, -8.286323773),
        (20.770071276, 0.4, -8.286323773),
        (20.770071276, 0.4, 6.033675466),
        (33.4199949, 0.4, 2.5986752),
        (33.4199949, 0.4, 7.5986752),
        (24.9199949, 0.4, 7.5986752),
        (24.9199949, 0.4, 2.5986752),
    ]]
    fillet(fillet_2_edges, radius=FILLET_2_R)

    # Sketch2 → Cut-Extrude1 (cut, through all)
    with BuildSketch(Plane.XZ):
        with BuildLine():
            Line((-21.856671641, 1.410725364), (-21.856671641, -1.713374506))
            ThreePointArc((-21.856671641, -1.713374506), (-27.956671641, -0.151324571), (-21.856671641, 1.410725364))
        make_face()
        with BuildLine():
            Line((-35.29833582, 1.410725364), (-35.29833582, -1.713374506))
            ThreePointArc((-35.29833582, -1.713374506), (-41.39833582, -0.151324571), (-35.29833582, 1.410725364))
        make_face()
        with BuildLine():
            Line((46.1399949, 1.410725364), (46.1399949, -1.713374506))
            ThreePointArc((46.1399949, -1.713374506), (40.0399949, -0.151324571), (46.1399949, 1.410725364))
        make_face()
    extrude(amount=-CUT_EXTRUDE1_DEPTH, mode=Mode.SUBTRACT)


solid = part_2.part
